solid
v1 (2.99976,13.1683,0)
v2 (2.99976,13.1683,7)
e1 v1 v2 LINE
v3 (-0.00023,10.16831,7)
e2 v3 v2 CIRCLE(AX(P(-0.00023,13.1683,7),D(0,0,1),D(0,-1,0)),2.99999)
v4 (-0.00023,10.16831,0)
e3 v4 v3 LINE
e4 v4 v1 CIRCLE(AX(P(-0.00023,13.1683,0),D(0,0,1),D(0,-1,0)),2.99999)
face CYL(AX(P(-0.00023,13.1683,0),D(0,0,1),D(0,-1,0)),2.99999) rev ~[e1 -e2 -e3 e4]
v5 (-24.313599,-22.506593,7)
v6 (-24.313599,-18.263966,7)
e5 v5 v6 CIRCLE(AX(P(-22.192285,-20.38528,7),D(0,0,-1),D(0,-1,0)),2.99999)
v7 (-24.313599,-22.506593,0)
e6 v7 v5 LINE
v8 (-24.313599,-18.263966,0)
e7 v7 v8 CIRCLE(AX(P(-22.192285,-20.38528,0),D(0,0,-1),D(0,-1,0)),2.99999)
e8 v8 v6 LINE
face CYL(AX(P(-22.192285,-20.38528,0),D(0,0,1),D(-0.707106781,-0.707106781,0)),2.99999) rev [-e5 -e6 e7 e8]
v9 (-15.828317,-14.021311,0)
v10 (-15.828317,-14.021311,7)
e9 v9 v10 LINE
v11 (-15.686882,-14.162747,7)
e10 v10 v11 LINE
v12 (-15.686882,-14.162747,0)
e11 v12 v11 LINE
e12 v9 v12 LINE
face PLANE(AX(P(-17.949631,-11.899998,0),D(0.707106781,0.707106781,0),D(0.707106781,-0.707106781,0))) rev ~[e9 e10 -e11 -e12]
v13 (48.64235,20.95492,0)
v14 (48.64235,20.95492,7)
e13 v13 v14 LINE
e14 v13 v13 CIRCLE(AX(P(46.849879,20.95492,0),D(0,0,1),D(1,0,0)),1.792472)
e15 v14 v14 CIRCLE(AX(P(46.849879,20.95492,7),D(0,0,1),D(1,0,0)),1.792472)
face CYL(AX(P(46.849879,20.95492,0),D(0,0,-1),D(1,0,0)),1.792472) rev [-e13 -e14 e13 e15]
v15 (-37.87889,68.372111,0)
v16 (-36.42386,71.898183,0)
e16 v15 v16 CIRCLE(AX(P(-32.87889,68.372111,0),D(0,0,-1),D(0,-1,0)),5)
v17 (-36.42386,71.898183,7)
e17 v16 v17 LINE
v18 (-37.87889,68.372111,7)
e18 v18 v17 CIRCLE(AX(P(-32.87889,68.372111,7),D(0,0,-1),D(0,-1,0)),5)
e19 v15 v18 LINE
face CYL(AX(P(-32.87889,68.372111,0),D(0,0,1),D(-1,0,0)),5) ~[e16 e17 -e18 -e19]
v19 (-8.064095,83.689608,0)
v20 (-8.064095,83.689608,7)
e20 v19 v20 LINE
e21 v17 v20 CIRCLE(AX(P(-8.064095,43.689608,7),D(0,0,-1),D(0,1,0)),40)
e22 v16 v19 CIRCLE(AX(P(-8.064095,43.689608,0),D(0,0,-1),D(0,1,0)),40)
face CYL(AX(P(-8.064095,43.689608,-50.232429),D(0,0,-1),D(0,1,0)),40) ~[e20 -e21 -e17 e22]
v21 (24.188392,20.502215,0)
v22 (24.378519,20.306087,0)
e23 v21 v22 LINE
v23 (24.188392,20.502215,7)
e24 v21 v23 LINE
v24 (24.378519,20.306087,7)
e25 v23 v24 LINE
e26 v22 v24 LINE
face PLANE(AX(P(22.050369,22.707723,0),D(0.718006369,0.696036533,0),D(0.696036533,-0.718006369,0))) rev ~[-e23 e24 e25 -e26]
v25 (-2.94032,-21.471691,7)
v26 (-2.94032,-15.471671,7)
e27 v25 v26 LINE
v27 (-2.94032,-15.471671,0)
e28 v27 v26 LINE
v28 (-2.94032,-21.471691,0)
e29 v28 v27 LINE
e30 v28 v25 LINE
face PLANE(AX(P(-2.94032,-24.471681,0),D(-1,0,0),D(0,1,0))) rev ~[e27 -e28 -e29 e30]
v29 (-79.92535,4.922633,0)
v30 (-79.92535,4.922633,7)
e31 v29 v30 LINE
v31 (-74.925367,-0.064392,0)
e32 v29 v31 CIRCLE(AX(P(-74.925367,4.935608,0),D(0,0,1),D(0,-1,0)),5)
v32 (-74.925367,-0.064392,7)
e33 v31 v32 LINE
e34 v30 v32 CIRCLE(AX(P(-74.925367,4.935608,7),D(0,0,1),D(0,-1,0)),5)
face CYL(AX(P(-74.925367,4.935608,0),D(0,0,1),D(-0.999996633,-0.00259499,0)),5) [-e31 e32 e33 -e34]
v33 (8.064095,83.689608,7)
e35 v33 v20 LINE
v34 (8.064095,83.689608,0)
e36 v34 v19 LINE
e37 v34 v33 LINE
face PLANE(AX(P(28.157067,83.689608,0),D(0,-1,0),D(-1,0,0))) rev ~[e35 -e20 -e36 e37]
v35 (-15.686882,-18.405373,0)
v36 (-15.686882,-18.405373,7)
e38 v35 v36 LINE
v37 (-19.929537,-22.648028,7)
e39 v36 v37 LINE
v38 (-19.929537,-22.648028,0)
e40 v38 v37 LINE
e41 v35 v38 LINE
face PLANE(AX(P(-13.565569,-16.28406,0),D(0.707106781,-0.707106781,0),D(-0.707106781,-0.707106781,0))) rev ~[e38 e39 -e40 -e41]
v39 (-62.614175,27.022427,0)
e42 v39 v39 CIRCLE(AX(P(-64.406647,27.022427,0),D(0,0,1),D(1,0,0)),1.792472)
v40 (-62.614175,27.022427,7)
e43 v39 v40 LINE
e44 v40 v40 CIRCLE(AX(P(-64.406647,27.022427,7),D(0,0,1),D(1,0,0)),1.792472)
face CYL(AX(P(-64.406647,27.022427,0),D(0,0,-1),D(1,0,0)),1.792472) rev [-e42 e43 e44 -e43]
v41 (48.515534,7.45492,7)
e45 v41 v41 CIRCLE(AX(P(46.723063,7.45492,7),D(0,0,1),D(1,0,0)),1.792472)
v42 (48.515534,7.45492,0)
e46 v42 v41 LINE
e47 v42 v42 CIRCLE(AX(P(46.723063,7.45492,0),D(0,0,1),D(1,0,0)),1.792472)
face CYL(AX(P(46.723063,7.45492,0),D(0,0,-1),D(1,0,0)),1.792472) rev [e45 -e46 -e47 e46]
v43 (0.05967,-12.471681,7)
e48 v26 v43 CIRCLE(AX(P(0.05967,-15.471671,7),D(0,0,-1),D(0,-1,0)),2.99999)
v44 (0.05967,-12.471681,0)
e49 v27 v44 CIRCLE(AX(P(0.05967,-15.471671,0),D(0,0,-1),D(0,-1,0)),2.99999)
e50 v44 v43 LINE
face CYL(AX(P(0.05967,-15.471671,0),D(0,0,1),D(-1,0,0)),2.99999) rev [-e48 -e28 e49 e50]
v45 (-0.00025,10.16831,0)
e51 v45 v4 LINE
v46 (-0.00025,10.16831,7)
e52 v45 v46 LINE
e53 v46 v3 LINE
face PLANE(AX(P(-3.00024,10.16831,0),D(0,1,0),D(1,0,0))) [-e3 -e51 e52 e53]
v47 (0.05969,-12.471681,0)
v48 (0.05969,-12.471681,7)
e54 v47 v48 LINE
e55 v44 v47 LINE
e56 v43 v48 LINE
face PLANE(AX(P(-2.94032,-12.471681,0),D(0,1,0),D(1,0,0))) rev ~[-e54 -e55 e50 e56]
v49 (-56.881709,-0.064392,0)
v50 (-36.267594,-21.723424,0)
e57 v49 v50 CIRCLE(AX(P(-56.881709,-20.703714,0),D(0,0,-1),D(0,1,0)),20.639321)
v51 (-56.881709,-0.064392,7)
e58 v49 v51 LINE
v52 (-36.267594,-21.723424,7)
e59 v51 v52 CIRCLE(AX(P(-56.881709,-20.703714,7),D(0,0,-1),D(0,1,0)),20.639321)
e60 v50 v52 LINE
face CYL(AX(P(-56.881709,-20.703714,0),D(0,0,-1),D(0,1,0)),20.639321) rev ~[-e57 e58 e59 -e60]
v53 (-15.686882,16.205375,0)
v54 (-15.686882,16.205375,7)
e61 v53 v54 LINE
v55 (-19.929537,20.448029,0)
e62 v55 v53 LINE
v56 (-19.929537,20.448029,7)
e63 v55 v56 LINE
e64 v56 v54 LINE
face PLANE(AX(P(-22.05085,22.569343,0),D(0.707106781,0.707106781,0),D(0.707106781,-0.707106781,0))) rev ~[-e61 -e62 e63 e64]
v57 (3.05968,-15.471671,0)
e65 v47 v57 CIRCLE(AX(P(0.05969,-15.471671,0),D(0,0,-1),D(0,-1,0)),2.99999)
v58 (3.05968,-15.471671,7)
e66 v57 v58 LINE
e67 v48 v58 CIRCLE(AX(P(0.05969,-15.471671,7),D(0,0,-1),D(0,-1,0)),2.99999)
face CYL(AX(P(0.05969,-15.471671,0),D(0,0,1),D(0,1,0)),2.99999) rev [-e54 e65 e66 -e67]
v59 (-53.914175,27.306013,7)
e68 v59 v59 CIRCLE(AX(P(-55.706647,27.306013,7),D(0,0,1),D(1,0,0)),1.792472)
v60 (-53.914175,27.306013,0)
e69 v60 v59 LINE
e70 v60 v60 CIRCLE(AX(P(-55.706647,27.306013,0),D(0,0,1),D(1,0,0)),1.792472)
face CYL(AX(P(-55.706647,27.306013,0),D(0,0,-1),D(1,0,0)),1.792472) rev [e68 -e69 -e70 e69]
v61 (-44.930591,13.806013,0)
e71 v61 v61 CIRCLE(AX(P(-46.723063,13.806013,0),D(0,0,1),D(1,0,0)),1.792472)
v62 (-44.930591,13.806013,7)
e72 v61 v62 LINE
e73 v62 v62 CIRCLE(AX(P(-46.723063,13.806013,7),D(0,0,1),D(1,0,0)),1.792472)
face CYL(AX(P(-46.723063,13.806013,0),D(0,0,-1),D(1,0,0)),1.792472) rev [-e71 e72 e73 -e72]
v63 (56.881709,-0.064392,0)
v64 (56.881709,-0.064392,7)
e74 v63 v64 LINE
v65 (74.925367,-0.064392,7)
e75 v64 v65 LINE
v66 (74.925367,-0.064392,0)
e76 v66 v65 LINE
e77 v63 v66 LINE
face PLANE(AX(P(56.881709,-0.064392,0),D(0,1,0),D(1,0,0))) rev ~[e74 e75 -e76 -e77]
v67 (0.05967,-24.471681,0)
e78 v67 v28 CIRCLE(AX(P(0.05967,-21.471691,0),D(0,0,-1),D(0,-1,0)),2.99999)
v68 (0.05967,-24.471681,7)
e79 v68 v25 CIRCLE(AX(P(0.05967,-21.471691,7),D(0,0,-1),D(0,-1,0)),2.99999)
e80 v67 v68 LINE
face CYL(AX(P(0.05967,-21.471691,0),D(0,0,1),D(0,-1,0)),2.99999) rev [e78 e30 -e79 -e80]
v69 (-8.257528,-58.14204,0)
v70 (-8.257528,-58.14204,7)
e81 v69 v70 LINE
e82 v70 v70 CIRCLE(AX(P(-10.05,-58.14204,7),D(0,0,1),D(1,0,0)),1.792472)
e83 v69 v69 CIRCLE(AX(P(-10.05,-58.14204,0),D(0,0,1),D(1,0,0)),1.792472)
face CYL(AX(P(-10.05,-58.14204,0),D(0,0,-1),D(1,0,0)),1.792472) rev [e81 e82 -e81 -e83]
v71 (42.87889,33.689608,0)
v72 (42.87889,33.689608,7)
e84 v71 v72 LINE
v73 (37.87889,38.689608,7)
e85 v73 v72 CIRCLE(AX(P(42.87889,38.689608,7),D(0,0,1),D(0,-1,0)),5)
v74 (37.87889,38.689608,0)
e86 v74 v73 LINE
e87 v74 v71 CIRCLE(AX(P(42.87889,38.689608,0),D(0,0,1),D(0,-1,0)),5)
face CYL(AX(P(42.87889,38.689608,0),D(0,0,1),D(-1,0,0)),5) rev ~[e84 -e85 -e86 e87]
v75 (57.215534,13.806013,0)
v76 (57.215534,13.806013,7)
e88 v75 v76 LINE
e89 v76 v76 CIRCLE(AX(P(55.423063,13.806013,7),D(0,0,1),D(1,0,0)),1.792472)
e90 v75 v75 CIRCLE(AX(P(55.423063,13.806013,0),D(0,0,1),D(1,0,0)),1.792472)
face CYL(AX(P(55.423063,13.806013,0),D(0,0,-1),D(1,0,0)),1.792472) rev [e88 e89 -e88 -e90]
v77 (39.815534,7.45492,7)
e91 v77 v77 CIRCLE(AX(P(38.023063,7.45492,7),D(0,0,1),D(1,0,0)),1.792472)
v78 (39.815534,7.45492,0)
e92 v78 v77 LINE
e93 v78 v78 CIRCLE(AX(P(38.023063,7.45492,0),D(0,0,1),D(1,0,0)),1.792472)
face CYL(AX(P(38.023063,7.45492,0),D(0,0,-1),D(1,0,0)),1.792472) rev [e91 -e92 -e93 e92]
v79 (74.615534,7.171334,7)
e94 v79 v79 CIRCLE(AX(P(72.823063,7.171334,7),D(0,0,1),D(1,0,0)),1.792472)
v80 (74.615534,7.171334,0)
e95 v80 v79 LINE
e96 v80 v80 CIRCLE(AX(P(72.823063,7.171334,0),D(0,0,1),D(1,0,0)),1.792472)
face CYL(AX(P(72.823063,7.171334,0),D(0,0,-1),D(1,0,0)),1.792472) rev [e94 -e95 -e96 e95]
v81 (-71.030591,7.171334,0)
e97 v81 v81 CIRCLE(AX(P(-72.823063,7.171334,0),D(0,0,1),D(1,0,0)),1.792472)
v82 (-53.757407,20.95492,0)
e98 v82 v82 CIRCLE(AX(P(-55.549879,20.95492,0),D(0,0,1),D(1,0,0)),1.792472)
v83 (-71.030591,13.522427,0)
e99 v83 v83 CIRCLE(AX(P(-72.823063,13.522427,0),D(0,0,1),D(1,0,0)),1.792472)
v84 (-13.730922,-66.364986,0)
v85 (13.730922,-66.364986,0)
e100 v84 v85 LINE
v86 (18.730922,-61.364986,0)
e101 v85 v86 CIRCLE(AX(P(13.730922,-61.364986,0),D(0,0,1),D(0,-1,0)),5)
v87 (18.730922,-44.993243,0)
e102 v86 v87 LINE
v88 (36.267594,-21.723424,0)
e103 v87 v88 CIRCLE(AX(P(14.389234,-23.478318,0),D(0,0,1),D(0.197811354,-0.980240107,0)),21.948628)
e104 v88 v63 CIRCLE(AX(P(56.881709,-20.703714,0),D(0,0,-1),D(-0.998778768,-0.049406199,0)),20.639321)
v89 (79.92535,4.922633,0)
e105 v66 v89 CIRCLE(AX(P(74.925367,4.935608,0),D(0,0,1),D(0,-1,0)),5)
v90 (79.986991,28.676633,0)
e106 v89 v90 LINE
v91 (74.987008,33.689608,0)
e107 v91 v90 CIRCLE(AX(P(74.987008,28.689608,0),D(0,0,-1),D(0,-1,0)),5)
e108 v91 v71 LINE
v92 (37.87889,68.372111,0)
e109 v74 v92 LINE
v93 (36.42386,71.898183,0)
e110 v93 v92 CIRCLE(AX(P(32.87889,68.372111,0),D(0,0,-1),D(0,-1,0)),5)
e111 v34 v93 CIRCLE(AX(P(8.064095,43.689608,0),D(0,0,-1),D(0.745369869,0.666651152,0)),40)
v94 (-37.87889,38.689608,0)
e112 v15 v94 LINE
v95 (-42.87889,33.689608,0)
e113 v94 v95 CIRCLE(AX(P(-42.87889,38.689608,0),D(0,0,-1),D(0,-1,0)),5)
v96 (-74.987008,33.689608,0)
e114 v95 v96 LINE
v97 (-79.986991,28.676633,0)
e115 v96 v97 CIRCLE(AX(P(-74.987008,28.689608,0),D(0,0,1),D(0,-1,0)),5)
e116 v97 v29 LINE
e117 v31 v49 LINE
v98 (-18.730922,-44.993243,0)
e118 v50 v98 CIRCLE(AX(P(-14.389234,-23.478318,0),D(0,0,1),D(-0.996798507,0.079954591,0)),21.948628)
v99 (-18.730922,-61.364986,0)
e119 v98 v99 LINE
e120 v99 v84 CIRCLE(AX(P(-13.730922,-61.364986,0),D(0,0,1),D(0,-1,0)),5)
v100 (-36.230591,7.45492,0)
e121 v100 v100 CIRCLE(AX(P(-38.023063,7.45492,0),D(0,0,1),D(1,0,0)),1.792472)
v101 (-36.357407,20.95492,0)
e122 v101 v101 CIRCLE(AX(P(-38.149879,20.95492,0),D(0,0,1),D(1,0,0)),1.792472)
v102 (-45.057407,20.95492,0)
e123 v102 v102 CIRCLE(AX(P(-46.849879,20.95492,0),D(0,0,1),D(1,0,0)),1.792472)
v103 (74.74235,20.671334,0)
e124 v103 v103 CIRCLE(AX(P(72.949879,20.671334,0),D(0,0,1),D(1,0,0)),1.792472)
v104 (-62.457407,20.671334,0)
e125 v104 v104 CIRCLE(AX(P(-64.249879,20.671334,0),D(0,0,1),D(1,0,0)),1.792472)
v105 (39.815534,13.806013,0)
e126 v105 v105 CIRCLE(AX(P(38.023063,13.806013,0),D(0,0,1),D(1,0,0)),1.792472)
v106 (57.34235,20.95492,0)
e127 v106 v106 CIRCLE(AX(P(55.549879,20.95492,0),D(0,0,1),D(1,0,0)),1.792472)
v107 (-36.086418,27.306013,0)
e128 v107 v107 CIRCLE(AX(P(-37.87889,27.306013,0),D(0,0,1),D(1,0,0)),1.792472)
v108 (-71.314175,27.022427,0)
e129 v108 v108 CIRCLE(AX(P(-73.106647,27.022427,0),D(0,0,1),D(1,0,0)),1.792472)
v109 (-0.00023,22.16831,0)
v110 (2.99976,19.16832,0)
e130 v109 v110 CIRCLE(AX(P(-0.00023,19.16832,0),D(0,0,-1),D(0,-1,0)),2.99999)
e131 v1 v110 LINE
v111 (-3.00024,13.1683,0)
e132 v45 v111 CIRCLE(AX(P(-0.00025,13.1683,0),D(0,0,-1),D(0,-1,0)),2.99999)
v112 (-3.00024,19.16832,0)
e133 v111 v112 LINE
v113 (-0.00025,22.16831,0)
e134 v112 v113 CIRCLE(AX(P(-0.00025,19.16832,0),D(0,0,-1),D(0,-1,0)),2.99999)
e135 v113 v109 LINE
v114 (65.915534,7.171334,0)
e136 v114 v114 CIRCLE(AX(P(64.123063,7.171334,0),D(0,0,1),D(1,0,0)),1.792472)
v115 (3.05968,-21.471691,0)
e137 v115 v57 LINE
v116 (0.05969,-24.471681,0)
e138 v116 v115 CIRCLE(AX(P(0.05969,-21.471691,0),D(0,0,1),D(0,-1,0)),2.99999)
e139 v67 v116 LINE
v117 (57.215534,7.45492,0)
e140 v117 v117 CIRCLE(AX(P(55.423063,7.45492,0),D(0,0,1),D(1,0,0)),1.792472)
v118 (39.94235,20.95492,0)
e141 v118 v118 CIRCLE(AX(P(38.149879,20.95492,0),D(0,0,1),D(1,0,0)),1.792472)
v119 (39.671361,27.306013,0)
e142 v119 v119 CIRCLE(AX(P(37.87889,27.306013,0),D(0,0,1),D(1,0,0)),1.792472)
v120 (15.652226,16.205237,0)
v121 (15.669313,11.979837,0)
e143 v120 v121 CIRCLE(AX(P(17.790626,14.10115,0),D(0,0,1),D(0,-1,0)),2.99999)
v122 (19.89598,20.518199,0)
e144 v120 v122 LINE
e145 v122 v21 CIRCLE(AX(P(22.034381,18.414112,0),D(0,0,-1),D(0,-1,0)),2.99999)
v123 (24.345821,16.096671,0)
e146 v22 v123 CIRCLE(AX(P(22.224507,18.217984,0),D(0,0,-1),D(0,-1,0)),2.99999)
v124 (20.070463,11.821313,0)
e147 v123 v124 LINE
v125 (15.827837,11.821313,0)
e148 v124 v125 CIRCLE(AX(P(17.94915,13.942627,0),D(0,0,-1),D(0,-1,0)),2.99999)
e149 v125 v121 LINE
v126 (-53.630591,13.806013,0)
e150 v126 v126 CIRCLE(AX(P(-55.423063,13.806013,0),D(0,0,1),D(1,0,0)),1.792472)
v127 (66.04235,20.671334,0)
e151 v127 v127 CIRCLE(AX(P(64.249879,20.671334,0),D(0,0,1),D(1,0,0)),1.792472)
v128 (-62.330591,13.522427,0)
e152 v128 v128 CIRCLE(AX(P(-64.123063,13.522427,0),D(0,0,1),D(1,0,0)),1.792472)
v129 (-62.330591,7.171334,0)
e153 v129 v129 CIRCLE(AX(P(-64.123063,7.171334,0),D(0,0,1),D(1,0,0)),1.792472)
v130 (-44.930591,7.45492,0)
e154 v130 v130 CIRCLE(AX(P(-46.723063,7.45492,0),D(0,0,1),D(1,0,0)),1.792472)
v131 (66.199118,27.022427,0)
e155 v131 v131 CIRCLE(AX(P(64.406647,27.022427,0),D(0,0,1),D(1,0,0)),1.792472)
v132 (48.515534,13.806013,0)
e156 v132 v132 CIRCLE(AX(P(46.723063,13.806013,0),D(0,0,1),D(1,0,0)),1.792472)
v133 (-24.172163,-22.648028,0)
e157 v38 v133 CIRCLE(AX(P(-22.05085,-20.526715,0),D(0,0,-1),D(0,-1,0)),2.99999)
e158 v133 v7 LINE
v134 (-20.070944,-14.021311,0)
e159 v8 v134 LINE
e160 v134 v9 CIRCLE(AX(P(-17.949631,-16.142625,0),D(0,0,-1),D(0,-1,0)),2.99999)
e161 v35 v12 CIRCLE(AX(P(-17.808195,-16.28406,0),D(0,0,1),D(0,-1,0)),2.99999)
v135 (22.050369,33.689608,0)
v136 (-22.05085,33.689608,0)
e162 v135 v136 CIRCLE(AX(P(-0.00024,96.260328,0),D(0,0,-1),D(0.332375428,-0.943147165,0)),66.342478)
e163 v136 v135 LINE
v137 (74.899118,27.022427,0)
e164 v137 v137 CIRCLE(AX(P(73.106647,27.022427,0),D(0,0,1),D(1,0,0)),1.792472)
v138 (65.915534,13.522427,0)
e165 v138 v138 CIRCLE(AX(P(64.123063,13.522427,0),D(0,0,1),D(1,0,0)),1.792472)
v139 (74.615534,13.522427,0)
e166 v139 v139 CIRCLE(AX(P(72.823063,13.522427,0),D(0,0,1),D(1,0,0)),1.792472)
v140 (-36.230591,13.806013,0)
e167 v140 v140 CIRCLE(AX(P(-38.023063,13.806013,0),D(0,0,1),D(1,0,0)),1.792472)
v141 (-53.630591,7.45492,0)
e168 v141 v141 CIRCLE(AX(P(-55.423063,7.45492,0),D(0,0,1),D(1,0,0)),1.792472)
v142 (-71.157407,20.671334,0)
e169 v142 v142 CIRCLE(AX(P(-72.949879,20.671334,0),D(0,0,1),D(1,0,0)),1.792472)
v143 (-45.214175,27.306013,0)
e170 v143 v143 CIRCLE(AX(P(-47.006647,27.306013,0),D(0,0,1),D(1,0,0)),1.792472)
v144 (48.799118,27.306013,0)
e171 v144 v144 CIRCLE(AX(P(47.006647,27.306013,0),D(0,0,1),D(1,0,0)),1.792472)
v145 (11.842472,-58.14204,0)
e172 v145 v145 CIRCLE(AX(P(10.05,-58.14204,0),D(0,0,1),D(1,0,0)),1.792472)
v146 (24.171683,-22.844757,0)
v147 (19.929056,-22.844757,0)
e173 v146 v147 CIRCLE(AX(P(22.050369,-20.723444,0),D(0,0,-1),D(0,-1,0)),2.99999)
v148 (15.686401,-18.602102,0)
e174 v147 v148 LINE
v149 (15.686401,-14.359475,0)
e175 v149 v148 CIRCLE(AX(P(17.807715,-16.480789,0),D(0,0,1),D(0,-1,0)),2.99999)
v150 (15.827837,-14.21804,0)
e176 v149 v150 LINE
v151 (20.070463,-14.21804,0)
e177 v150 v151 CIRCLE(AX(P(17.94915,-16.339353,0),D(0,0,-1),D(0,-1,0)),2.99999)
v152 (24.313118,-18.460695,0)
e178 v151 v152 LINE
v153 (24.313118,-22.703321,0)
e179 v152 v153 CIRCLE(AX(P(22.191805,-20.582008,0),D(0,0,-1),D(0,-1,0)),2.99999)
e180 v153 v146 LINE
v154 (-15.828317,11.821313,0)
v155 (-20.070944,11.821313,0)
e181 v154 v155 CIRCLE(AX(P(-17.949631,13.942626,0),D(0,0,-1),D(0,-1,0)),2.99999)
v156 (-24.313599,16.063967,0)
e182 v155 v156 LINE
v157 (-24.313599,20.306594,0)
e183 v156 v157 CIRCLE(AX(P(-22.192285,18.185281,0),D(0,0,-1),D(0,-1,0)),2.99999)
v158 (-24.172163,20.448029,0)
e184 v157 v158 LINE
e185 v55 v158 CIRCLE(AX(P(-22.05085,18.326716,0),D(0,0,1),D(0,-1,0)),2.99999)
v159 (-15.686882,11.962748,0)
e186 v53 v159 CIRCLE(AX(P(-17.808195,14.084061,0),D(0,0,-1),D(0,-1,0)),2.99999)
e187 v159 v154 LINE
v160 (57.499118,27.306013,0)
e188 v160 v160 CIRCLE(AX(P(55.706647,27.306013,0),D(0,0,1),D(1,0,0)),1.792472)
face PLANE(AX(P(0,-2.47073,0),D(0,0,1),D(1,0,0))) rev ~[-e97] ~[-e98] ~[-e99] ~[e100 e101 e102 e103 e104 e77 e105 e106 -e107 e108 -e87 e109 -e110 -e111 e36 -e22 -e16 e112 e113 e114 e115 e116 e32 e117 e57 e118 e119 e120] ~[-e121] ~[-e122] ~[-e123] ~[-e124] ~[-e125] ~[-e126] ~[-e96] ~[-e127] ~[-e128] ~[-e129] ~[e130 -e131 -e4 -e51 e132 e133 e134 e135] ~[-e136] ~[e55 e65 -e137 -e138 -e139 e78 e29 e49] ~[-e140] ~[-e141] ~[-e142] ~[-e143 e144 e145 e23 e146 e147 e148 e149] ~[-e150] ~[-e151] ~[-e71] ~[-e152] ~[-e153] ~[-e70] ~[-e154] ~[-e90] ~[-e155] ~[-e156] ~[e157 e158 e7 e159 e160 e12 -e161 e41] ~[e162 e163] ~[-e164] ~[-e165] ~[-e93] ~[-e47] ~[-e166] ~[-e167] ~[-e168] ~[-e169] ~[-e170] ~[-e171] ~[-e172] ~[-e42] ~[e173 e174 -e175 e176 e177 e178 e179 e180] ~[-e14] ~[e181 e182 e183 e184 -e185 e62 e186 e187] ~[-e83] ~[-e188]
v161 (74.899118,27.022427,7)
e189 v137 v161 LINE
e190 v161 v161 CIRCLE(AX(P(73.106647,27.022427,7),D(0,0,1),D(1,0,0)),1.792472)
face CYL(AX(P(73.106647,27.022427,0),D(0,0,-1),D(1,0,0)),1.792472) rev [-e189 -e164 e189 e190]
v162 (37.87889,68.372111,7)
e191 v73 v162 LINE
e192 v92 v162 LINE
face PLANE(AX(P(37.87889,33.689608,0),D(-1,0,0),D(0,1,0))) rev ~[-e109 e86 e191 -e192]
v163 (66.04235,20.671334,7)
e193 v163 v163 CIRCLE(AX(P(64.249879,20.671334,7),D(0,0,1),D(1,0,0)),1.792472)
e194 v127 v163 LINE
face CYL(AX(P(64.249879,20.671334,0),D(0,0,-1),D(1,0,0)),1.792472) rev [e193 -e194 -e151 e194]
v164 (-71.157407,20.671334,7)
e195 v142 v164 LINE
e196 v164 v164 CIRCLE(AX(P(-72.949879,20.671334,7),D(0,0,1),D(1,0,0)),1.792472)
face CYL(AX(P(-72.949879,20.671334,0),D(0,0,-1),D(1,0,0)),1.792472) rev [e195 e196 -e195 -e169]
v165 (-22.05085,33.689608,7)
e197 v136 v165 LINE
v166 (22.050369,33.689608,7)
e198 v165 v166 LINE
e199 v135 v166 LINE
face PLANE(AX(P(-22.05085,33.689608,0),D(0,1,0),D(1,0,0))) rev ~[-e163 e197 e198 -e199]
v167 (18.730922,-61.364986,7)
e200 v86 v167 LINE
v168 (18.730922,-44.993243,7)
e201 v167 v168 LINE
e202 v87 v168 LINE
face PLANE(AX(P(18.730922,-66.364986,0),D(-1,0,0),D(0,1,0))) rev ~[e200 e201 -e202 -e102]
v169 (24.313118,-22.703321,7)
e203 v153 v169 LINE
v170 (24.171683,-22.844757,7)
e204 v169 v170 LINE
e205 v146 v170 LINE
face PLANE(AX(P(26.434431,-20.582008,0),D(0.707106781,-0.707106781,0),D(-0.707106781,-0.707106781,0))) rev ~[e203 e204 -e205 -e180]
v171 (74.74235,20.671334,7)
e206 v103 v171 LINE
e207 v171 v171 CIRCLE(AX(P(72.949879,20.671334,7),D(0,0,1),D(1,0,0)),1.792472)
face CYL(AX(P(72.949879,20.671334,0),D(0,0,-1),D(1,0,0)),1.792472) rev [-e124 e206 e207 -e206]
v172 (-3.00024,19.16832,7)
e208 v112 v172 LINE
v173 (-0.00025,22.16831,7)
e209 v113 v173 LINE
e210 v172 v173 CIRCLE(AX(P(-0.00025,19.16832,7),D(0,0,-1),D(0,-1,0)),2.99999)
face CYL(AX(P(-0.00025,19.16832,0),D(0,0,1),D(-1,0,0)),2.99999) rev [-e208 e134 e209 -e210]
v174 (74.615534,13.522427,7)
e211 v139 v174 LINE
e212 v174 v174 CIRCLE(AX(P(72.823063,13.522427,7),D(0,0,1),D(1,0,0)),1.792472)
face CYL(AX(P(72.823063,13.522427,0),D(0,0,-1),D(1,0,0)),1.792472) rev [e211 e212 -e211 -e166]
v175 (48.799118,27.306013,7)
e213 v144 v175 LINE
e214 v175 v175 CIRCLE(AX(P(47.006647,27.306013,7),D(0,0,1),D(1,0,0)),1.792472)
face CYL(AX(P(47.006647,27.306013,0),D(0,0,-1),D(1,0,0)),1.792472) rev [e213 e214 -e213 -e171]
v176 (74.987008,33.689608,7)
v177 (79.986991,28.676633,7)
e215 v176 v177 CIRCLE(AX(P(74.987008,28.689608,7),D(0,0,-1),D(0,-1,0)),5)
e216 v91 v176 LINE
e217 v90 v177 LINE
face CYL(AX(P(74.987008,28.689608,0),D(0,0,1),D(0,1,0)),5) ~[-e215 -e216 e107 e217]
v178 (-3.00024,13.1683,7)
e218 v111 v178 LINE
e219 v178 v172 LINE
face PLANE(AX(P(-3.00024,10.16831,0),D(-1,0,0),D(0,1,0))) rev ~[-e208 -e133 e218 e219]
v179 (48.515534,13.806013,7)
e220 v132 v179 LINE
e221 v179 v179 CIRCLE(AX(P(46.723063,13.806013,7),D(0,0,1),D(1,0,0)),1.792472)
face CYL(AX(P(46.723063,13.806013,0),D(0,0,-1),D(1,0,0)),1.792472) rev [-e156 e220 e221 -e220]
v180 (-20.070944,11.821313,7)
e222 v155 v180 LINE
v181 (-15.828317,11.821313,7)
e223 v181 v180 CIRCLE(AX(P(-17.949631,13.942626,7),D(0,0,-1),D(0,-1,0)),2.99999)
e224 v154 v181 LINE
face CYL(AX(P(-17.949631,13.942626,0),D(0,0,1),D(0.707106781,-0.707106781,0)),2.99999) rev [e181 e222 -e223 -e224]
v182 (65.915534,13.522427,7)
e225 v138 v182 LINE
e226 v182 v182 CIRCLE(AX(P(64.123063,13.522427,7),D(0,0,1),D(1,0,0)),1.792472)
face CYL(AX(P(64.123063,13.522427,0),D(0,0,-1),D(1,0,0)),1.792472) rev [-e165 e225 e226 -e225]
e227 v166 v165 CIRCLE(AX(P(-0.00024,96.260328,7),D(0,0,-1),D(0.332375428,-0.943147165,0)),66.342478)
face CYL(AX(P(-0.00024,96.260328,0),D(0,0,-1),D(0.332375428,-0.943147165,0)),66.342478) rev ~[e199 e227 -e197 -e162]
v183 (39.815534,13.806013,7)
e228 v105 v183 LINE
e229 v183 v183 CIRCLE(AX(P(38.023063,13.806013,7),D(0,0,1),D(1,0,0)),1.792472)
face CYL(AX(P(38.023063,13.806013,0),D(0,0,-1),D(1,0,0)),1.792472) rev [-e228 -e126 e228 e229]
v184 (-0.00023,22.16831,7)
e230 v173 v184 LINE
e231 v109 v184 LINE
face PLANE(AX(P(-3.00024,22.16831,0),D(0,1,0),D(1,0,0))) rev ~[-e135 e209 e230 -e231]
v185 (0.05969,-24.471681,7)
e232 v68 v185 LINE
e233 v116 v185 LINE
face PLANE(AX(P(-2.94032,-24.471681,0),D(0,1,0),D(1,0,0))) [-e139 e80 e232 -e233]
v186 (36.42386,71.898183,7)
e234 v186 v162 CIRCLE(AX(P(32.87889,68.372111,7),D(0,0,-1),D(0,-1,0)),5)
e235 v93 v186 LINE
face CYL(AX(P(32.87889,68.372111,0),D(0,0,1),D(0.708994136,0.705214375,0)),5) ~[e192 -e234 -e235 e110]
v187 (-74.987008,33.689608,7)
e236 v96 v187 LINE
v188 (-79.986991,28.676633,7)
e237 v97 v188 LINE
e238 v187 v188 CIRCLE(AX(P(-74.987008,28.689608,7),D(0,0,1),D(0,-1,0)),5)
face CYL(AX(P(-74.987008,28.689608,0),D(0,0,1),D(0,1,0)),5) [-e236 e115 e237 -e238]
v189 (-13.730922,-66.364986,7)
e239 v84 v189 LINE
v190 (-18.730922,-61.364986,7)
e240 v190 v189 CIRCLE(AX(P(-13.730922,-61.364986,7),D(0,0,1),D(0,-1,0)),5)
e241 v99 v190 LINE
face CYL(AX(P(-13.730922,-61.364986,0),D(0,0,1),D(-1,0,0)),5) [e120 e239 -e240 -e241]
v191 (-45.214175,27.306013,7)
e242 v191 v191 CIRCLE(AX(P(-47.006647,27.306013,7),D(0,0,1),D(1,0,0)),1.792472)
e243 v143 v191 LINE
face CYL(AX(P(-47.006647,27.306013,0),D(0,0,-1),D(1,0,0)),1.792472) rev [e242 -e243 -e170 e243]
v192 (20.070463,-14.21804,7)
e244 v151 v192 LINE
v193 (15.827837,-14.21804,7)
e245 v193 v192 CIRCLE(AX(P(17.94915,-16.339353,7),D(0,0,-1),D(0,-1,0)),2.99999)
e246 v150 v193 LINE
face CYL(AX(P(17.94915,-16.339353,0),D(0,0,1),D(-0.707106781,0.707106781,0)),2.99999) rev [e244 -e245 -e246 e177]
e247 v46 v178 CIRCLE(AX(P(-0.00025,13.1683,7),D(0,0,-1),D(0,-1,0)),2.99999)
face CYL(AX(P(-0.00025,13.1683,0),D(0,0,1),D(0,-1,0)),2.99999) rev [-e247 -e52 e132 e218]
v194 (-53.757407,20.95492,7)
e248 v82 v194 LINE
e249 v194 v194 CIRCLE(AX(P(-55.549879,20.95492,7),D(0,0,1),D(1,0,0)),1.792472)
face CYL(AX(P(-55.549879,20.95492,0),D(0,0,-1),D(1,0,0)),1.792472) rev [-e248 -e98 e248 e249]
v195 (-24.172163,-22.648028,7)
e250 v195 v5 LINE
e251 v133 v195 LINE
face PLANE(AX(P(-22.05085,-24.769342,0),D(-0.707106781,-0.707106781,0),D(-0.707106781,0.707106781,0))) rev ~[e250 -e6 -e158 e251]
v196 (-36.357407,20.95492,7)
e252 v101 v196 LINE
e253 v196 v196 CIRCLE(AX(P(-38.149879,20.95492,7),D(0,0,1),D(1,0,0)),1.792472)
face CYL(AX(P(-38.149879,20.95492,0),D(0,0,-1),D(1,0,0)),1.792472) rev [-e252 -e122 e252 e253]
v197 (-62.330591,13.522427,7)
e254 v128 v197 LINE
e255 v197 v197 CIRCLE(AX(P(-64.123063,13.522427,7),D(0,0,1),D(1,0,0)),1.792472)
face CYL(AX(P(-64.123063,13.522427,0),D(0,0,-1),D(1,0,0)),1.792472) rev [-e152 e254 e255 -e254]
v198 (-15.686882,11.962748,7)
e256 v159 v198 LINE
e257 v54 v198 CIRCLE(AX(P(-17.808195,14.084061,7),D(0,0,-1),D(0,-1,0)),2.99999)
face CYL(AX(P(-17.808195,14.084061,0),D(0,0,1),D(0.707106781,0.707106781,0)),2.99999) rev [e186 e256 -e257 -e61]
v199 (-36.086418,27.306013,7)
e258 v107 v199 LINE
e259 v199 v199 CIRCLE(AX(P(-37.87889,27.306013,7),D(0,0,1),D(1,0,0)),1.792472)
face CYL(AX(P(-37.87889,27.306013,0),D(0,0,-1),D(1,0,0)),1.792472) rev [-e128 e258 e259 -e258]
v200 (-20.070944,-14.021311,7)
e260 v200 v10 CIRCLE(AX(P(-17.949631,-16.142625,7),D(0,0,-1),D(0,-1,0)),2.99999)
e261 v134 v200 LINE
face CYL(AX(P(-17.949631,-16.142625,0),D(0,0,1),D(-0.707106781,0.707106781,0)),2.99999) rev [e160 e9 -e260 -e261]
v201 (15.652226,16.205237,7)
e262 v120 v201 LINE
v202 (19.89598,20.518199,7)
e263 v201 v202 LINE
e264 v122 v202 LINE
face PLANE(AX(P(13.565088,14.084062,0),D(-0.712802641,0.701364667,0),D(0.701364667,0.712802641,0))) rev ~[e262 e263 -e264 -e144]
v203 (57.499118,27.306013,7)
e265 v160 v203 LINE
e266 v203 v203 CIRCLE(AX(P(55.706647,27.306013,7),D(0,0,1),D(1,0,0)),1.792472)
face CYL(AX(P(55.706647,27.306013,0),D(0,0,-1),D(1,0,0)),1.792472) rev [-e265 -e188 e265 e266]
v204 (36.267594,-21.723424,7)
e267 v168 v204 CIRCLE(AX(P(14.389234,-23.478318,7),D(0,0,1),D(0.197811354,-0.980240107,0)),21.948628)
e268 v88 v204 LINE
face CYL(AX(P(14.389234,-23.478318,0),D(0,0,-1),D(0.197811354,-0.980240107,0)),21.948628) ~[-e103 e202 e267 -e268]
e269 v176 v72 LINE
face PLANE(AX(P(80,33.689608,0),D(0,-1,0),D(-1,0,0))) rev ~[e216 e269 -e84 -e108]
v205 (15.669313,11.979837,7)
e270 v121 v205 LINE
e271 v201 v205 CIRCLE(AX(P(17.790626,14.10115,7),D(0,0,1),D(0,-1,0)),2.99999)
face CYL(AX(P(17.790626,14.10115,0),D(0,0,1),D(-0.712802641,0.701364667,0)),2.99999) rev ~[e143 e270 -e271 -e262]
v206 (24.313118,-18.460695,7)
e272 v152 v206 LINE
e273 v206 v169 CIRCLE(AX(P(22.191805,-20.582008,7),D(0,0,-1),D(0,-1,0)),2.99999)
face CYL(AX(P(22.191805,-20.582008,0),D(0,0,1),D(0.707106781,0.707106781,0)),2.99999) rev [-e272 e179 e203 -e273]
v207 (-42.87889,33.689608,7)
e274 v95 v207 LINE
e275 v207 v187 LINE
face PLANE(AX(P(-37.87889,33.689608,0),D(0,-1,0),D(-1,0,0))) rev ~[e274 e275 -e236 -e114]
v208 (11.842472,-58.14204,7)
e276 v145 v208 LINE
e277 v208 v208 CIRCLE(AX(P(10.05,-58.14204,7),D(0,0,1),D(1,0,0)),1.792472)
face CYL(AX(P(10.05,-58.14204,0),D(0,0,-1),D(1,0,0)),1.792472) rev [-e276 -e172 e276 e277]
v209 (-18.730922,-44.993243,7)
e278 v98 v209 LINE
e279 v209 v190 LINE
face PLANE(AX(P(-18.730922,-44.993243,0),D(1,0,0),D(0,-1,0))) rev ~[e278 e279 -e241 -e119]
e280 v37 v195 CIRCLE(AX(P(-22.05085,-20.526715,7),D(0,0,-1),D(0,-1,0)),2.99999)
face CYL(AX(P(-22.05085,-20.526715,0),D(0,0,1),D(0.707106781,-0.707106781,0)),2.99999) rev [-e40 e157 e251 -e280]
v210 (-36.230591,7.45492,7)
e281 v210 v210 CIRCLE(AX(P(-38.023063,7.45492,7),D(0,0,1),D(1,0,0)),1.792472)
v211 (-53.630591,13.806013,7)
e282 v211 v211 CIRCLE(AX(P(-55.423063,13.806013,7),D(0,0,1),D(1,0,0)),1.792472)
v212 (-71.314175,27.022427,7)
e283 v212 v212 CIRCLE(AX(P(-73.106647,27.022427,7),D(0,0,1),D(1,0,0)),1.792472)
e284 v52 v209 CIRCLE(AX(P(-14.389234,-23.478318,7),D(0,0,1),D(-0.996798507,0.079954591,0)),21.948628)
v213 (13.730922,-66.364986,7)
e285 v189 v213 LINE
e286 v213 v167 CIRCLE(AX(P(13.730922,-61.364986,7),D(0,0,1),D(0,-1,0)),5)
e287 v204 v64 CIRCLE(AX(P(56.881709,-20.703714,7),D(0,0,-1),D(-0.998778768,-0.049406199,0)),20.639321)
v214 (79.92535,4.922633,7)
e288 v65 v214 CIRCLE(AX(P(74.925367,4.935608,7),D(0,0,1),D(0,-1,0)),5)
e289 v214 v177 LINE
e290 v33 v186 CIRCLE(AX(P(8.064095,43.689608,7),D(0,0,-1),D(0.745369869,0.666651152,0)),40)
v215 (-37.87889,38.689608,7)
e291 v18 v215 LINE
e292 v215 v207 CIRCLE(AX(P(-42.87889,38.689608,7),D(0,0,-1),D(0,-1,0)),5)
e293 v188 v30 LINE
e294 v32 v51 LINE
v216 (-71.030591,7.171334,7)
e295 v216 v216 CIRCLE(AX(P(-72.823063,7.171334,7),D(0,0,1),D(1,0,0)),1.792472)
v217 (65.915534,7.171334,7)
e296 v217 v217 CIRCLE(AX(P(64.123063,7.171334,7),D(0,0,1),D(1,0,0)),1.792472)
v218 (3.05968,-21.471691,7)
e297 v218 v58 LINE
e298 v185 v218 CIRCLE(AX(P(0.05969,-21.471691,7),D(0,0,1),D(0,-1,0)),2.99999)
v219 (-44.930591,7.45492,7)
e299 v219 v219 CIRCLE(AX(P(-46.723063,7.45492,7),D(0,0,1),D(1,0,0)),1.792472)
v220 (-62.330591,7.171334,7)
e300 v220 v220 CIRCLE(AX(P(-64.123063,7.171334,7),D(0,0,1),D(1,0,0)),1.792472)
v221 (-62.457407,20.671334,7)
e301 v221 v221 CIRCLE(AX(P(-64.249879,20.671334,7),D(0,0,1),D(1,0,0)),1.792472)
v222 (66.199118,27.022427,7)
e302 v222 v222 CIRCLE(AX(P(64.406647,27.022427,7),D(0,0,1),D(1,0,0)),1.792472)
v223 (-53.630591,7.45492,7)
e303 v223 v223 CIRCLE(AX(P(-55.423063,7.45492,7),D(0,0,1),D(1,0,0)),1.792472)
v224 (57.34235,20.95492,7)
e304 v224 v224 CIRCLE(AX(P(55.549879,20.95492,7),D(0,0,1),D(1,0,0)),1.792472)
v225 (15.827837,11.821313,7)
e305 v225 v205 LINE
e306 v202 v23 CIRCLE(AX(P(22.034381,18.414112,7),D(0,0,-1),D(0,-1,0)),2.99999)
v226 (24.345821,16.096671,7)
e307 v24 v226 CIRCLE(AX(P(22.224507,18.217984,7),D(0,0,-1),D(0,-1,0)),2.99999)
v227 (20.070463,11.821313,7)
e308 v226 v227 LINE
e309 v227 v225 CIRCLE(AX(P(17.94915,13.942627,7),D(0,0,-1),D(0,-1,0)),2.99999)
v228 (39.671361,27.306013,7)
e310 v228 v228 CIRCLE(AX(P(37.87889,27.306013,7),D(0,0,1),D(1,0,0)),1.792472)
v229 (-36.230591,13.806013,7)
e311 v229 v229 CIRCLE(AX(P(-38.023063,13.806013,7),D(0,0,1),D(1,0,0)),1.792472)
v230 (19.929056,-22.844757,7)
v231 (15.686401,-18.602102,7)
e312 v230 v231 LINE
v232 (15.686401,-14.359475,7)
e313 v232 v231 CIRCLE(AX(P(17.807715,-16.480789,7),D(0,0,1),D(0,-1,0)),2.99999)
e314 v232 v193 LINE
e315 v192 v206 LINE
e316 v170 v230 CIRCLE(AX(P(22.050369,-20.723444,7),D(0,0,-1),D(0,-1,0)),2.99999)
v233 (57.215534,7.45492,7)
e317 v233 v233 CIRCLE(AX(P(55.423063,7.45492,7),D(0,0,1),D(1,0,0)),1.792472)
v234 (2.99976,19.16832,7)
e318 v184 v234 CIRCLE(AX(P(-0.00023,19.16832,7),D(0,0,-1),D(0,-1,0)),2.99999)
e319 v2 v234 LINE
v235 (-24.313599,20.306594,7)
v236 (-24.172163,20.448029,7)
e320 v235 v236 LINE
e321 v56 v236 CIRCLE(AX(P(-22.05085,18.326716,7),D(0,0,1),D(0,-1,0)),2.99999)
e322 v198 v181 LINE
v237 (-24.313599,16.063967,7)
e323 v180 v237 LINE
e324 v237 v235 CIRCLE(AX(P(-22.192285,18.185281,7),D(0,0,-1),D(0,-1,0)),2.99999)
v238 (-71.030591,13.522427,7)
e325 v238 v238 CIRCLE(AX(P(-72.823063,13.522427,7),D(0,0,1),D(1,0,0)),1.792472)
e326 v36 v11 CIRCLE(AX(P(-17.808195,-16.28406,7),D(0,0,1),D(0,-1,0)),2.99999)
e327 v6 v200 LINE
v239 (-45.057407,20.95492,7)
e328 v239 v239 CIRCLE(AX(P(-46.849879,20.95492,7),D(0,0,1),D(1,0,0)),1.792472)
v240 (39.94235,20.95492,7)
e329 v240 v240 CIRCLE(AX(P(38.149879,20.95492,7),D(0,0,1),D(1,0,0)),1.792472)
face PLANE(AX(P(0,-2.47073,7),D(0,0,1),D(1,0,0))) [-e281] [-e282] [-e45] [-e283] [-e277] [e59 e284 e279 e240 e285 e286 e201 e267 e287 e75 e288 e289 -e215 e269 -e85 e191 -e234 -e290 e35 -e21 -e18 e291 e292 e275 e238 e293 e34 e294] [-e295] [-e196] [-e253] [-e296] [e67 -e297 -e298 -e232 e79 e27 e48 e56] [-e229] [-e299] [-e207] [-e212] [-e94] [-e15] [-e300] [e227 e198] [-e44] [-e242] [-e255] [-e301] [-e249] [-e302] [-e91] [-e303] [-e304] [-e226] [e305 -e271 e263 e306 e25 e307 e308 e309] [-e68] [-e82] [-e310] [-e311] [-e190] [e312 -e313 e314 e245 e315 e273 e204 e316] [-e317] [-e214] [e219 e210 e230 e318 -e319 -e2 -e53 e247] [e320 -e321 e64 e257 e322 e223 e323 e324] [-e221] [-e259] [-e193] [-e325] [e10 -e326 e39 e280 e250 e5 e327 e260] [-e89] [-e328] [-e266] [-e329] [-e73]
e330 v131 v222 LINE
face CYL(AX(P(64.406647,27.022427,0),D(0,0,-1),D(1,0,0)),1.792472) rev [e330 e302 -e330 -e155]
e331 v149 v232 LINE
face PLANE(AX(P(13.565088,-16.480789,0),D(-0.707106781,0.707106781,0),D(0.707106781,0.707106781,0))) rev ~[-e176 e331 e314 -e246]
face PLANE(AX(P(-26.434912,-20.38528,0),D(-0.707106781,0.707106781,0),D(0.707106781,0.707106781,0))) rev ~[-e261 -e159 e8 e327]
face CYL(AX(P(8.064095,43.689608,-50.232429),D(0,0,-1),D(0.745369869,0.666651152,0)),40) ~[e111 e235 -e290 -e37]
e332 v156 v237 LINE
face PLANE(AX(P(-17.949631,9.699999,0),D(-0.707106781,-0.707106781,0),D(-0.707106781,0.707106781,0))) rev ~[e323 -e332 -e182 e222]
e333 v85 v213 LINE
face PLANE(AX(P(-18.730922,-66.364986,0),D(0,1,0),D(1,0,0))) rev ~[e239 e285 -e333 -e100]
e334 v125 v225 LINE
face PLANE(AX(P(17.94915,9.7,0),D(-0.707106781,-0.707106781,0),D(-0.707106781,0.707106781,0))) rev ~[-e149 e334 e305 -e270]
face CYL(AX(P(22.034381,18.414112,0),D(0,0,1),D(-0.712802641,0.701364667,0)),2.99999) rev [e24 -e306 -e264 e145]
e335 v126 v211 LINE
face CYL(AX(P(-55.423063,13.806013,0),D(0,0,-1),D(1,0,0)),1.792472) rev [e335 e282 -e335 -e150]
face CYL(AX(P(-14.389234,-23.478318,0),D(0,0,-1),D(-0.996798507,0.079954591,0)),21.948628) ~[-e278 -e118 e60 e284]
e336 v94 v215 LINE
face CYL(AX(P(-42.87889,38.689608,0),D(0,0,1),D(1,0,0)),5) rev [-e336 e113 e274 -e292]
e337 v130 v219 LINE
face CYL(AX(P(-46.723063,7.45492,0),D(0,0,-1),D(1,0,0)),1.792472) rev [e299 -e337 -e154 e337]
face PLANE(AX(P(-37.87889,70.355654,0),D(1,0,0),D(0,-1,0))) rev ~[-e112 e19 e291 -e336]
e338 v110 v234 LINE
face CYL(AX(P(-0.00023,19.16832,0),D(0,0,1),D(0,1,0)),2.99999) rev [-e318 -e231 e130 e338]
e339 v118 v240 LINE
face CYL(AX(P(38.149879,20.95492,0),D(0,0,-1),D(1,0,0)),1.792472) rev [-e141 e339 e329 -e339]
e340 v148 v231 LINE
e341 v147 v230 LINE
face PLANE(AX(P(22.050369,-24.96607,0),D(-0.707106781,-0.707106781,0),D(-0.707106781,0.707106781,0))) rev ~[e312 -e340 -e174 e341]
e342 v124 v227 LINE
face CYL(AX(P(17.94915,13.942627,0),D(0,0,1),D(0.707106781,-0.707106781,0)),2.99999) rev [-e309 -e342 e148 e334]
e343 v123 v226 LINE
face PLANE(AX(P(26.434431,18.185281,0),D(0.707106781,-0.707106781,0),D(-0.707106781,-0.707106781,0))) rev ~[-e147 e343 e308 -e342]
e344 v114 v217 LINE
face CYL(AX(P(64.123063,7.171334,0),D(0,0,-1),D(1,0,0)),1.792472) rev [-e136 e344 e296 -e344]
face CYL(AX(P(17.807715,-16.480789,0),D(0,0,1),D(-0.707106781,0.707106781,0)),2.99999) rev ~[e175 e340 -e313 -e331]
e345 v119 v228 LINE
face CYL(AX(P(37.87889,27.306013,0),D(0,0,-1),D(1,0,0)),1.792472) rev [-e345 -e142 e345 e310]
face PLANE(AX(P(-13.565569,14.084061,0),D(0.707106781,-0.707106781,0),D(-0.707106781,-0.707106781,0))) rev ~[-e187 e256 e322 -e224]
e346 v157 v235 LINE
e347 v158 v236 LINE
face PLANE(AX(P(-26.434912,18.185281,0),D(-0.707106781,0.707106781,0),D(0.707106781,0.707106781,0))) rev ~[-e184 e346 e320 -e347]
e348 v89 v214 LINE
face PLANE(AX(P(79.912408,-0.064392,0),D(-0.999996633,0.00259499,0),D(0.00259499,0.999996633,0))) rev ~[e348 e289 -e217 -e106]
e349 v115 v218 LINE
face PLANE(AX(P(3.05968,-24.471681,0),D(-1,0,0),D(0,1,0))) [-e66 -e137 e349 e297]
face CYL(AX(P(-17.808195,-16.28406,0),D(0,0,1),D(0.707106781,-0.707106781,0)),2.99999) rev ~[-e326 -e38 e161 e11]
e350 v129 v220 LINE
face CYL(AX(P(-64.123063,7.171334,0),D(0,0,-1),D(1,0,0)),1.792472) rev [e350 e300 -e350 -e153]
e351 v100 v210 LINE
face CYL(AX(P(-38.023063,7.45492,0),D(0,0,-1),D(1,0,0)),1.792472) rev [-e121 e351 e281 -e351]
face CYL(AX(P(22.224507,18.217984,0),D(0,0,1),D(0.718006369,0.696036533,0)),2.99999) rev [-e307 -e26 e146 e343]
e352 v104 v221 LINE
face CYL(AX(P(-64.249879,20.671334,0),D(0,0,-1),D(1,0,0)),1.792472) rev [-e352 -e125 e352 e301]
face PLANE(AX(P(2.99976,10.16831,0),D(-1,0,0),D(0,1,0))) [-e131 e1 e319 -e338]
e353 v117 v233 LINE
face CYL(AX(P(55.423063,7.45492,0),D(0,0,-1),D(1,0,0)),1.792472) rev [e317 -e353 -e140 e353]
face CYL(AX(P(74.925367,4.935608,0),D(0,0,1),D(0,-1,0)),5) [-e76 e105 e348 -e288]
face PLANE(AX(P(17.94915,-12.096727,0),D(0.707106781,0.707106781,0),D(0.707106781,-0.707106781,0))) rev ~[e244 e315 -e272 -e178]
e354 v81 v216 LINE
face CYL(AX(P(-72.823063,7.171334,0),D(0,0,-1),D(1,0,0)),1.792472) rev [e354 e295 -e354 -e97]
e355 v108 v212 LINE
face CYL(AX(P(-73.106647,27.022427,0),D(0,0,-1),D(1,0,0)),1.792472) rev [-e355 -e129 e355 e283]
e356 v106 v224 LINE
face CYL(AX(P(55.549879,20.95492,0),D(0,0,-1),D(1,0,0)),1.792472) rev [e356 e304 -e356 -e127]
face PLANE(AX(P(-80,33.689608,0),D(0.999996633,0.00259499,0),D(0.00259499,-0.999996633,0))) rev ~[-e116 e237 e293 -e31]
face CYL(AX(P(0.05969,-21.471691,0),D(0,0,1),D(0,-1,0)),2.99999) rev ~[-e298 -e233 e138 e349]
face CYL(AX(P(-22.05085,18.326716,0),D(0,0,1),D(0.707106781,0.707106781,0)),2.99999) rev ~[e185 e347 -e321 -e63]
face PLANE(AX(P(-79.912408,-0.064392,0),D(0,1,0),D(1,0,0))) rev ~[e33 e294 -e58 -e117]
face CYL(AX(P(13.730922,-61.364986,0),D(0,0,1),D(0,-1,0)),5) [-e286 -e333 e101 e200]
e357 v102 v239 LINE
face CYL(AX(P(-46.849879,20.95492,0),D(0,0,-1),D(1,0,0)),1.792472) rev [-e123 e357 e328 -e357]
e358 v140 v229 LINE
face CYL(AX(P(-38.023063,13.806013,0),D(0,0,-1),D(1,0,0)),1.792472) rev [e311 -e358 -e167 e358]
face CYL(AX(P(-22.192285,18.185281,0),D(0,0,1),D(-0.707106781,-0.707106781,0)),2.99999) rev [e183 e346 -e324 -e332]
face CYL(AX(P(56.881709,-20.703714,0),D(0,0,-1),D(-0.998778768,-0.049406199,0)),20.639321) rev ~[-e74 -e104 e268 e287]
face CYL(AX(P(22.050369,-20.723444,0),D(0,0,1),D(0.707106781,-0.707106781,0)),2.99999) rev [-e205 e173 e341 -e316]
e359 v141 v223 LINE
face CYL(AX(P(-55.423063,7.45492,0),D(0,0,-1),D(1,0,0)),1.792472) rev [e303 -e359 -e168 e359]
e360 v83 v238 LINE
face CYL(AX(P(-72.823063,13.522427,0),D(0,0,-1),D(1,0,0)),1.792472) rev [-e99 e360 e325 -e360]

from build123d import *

# Parameters (mm, degrees)
F0_R        = 1.7924715581
F0_W        = 6
F0_H        = 12
F1_DEPTH    = 7
F2_R        = 5
F3_R        = 2.99999
F4_R        = 5
F5_R        = 5
F6_T1_DEPTH = 107.4648585932
F7_R        = 5
F8_R        = 5


# Not quite as in the source:
# - a fillet or chamfer that OpenCascade refuses, or shapes differently, is made with other operations: its cross-section is extruded or revolved along the edge and cut away or added
# - a fillet or chamfer is up to 0.001 mm smaller than in the source, because OpenCascade refuses the exact size


with BuildPart() as f1:
    # F0 (on Top) → F1 (new body)
    with BuildSketch(Plane.XY):
        with BuildLine():
            ThreePointArc((22.0503693582, 33.6896076798), (-0.0002403073, 29.9178496953), (-22.0508499728, 33.6896076798))
            Line((-22.0508499728, 33.6896076798), (-37.8788895905, 33.6896076798))
            Line((-37.8788895905, 33.6896076798), (-80, 33.6896076798))
            Line((-80, 33.6896076798), (-79.9124084099, -0.0643923202))
            Line((-79.9124084099, -0.0643923202), (-56.8817094834, -0.0643923202))
            ThreePointArc((-56.8817094834, -0.0643923202), (-41.9313295872, -6.4745981979), (-36.267593503, -21.72342412))
            ThreePointArc((-36.267593503, -21.72342412), (-31.9176063477, -36.6881030976), (-18.7309216708, -44.9932432158))
            Line((-18.7309216708, -44.9932432158), (-18.7309216708, -66.3649858077))
            Line((-18.7309216708, -66.3649858077), (0, -66.3649858077))
            Line((0, -66.3649858077), (18.7309216708, -66.3649858077))
            Line((18.7309216708, -66.3649858077), (18.7309216708, -44.9932432158))
            ThreePointArc((18.7309216708, -44.9932432158), (31.9176063477, -36.6881030976), (36.267593503, -21.72342412))
            ThreePointArc((36.267593503, -21.72342412), (41.9313295872, -6.4745981979), (56.8817094834, -0.0643923202))
            Line((56.8817094834, -0.0643923202), (79.9124084099, -0.0643923202))
            Line((79.9124084099, -0.0643923202), (80, 33.6896076798))
            Line((80, 33.6896076798), (37.8788895905, 33.6896076798))
            Line((37.8788895905, 33.6896076798), (22.0503693582, 33.6896076798))
        make_face()
        with Locations((-10.05, -58.1420399249)):
            Circle(F0_R, mode=Mode.SUBTRACT)
        with Locations((-72.8230625391, 7.1713337675)):
            Circle(F0_R, mode=Mode.SUBTRACT)
        with Locations((-64.1230625391, 7.1713337675)):
            Circle(F0_R, mode=Mode.SUBTRACT)
        with Locations((-55.4230625391, 7.4549200945)):
            Circle(F0_R, mode=Mode.SUBTRACT)
        with Locations((-46.7230625391, 7.4549200945)):
            Circle(F0_R, mode=Mode.SUBTRACT)
        Polygon((-22.0508499728, -24.7693415731), (-26.4349120161, -20.3852795298), (-17.9496306418, -11.8999981554), (-13.5655685985, -16.2840601989), align=None, mode=Mode.SUBTRACT)
        with Locations((-38.0230625391, 7.4549200945)):
            Circle(F0_R, mode=Mode.SUBTRACT)
        with Locations((10.05, -58.1420399249)):
            Circle(F0_R, mode=Mode.SUBTRACT)
        with Locations((0.059680174, -18.4716808143)):
            Rectangle(F0_W, F0_H, mode=Mode.SUBTRACT)
        Polygon((17.9491500272, -12.0967266704), (26.4344314015, -20.5820080448), (22.0503693582, -24.9660700881), (13.5650879839, -16.4807887139), align=None, mode=Mode.SUBTRACT)
        with Locations((38.0230625391, 7.4549200945)):
            Circle(F0_R, mode=Mode.SUBTRACT)
        with Locations((46.7230625391, 7.4549200945)):
            Circle(F0_R, mode=Mode.SUBTRACT)
        with Locations((55.4230625391, 7.4549200945)):
            Circle(F0_R, mode=Mode.SUBTRACT)
        with Locations((64.1230625391, 7.1713337675)):
            Circle(F0_R, mode=Mode.SUBTRACT)
        with Locations((72.8230625391, 7.1713337675)):
            Circle(F0_R, mode=Mode.SUBTRACT)
        with Locations((-72.8230625391, 13.522426948)):
            Circle(F0_R, mode=Mode.SUBTRACT)
        with Locations((-64.1230625391, 13.522426948)):
            Circle(F0_R, mode=Mode.SUBTRACT)
        with Locations((-72.9498788714, 20.6713337675)):
            Circle(F0_R, mode=Mode.SUBTRACT)
        with Locations((-73.1066465378, 27.022426948)):
            Circle(F0_R, mode=Mode.SUBTRACT)
        with Locations((-64.2498788714, 20.6713337675)):
            Circle(F0_R, mode=Mode.SUBTRACT)
        with Locations((-64.4066465378, 27.022426948)):
            Circle(F0_R, mode=Mode.SUBTRACT)
        with Locations((-55.4230625391, 13.8060132749)):
            Circle(F0_R, mode=Mode.SUBTRACT)
        with Locations((-46.7230625391, 13.8060132749)):
            Circle(F0_R, mode=Mode.SUBTRACT)
        with Locations((-55.5498788714, 20.9549200945)):
            Circle(F0_R, mode=Mode.SUBTRACT)
        with Locations((-55.7066465378, 27.3060132749)):
            Circle(F0_R, mode=Mode.SUBTRACT)
        with Locations((-46.8498788714, 20.9549200945)):
            Circle(F0_R, mode=Mode.SUBTRACT)
        with Locations((-47.0066465378, 27.3060132749)):
            Circle(F0_R, mode=Mode.SUBTRACT)
        with Locations((-38.0230625391, 13.8060132749)):
            Circle(F0_R, mode=Mode.SUBTRACT)
        Polygon((-13.5655685985, 14.0840613981), (-17.9496306418, 9.6999993546), (-26.4349120162, 18.185280729), (-22.0508499728, 22.5693427724), align=None, mode=Mode.SUBTRACT)
        with Locations((-38.1498788714, 20.9549200945)):
            Circle(F0_R, mode=Mode.SUBTRACT)
        with Locations((-37.8788895905, 27.3060132749)):
            Circle(F0_R, mode=Mode.SUBTRACT)
        with Locations((-0.0002403073, 16.1683102548)):
            Rectangle(F0_W, F0_H, mode=Mode.SUBTRACT)
        Polygon((22.0503693582, 22.7077228269), (26.4344314015, 18.1852813744), (17.9491500272, 9.7), (13.5650879839, 14.0840620435), align=None, mode=Mode.SUBTRACT)
        with Locations((38.0230625391, 13.8060132749)):
            Circle(F0_R, mode=Mode.SUBTRACT)
        with Locations((38.1498788714, 20.9549200945)):
            Circle(F0_R, mode=Mode.SUBTRACT)
        with Locations((37.8788895905, 27.3060132749)):
            Circle(F0_R, mode=Mode.SUBTRACT)
        with Locations((46.7230625391, 13.8060132749)):
            Circle(F0_R, mode=Mode.SUBTRACT)
        with Locations((55.4230625391, 13.8060132749)):
            Circle(F0_R, mode=Mode.SUBTRACT)
        with Locations((46.8498788714, 20.9549200945)):
            Circle(F0_R, mode=Mode.SUBTRACT)
        with Locations((47.0066465378, 27.3060132749)):
            Circle(F0_R, mode=Mode.SUBTRACT)
        with Locations((55.5498788714, 20.9549200945)):
            Circle(F0_R, mode=Mode.SUBTRACT)
        with Locations((55.7066465378, 27.3060132749)):
            Circle(F0_R, mode=Mode.SUBTRACT)
        with Locations((64.1230625391, 13.522426948)):
            Circle(F0_R, mode=Mode.SUBTRACT)
        with Locations((72.8230625391, 13.522426948)):
            Circle(F0_R, mode=Mode.SUBTRACT)
        with Locations((64.2498788714, 20.6713337675)):
            Circle(F0_R, mode=Mode.SUBTRACT)
        with Locations((64.4066465378, 27.022426948)):
            Circle(F0_R, mode=Mode.SUBTRACT)
        with Locations((72.9498788714, 20.6713337675)):
            Circle(F0_R, mode=Mode.SUBTRACT)
        with Locations((73.1066465378, 27.022426948)):
            Circle(F0_R, mode=Mode.SUBTRACT)
        Polygon((-37.8788895905, 33.6896076798), (-22.0508499728, 33.6896076798), (0, 33.6896076798), (0.149998191, 33.6896076798), (22.0503693582, 33.6896076798), (37.8788895905, 33.6896076798), (37.8788895905, 70.3556537628), (28.1570665538, 83.6896076798), (-28.1570665538, 83.6896076798), (-37.8788895905, 70.3556537628), align=None)
    extrude(amount=F1_DEPTH)

    # F2
    f2_edges = [f1.edges().sort_by_distance(p)[0] for p in [
        (-80, 33.689608, 3.5),
        (-79.912408, -0.064392, 3.5),
        (-18.730922, -66.364986, 3.5),
        (18.730922, -66.364986, 3.5),
        (79.912408, -0.064392, 3.5),
        (80, 33.689608, 3.5),
    ]]
    fillet(f2_edges, radius=F2_R)

    # F3 (radius 3 in the source; OpenCascade refuses exactly that, so slightly less here)
    f3_edges = [f1.edges().sort_by_distance(p)[0] for p in [
        (-22.05085, 22.569343, 3.5),
        (-13.565569, 14.084061, 3.5),
        (26.434431, 18.185281, 3.5),
        (22.050369, 22.707723, 3.5),
        (2.99976, 22.16831, 3.5),
        (-3.00024, 22.16831, 3.5),
        (-26.434912, 18.185281, 3.5),
        (-3.00024, 10.16831, 3.5),
        (-17.949631, 9.699999, 3.5),
        (17.94915, 9.7, 3.5),
        (13.565088, 14.084062, 3.5),
        (2.99976, 10.16831, 3.5),
        (13.565088, -16.480789, 3.5),
        (-2.94032, -24.471681, 3.5),
        (-2.94032, -12.471681, 3.5),
        (17.94915, -12.096727, 3.5),
        (3.05968, -12.471681, 3.5),
        (26.434431, -20.582008, 3.5),
        (22.050369, -24.96607, 3.5),
        (3.05968, -24.471681, 3.5),
        (-17.949631, -11.899998, 3.5),
        (-26.434912, -20.38528, 3.5),
        (-13.565569, -16.28406, 3.5),
        (-22.05085, -24.769342, 3.5),
    ]]
    fillet(f3_edges, radius=F3_R)

    # F4
    f4_edges = [f1.edges().sort_by_distance(p)[0] for p in [
        (-37.87889, 33.689608, 3.5),
    ]]
    fillet(f4_edges, radius=F4_R)

    # F5
    f5_edges = [f1.edges().sort_by_distance(p)[0] for p in [
        (37.87889, 33.689608, 3.5),
    ]]
    fillet(f5_edges, radius=F5_R)

    # F6: fillet of radius 40 on 2 edges, made by hand

    # F6_s2 → F6_t1 (cut)
    with BuildSketch(Plane.XY.offset(-50.2324292966)):
        with BuildLine():
            ThreePointArc((-8.0640948352, 83.6896076798), (-24.3944064777, 80.2042748926), (-37.8788895905, 70.3556537628))
            Line((-37.8788895905, 70.3556537628), (-28.1570665538, 83.6896076798))
            Line((-28.1570665538, 83.6896076798), (-8.0640948352, 83.6896076798))
        make_face()
        with BuildLine():
            ThreePointArc((37.8788895905, 70.3556537628), (24.3944064777, 80.2042748926), (8.0640948352, 83.6896076798))
            Line((8.0640948352, 83.6896076798), (28.1570665538, 83.6896076798))
            Line((28.1570665538, 83.6896076798), (37.8788895905, 70.3556537628))
        make_face()
    extrude(amount=F6_T1_DEPTH, mode=Mode.SUBTRACT)

    # F7
    f7_edges = [f1.edges().sort_by_distance(p)[0] for p in [
        (-37.87889, 70.355654, 3.5),
    ]]
    fillet(f7_edges, radius=F7_R)

    # F8
    f8_edges = [f1.edges().sort_by_distance(p)[0] for p in [
        (37.87889, 70.355654, 3.5),
    ]]
    fillet(f8_edges, radius=F8_R)


solid = f1.part
